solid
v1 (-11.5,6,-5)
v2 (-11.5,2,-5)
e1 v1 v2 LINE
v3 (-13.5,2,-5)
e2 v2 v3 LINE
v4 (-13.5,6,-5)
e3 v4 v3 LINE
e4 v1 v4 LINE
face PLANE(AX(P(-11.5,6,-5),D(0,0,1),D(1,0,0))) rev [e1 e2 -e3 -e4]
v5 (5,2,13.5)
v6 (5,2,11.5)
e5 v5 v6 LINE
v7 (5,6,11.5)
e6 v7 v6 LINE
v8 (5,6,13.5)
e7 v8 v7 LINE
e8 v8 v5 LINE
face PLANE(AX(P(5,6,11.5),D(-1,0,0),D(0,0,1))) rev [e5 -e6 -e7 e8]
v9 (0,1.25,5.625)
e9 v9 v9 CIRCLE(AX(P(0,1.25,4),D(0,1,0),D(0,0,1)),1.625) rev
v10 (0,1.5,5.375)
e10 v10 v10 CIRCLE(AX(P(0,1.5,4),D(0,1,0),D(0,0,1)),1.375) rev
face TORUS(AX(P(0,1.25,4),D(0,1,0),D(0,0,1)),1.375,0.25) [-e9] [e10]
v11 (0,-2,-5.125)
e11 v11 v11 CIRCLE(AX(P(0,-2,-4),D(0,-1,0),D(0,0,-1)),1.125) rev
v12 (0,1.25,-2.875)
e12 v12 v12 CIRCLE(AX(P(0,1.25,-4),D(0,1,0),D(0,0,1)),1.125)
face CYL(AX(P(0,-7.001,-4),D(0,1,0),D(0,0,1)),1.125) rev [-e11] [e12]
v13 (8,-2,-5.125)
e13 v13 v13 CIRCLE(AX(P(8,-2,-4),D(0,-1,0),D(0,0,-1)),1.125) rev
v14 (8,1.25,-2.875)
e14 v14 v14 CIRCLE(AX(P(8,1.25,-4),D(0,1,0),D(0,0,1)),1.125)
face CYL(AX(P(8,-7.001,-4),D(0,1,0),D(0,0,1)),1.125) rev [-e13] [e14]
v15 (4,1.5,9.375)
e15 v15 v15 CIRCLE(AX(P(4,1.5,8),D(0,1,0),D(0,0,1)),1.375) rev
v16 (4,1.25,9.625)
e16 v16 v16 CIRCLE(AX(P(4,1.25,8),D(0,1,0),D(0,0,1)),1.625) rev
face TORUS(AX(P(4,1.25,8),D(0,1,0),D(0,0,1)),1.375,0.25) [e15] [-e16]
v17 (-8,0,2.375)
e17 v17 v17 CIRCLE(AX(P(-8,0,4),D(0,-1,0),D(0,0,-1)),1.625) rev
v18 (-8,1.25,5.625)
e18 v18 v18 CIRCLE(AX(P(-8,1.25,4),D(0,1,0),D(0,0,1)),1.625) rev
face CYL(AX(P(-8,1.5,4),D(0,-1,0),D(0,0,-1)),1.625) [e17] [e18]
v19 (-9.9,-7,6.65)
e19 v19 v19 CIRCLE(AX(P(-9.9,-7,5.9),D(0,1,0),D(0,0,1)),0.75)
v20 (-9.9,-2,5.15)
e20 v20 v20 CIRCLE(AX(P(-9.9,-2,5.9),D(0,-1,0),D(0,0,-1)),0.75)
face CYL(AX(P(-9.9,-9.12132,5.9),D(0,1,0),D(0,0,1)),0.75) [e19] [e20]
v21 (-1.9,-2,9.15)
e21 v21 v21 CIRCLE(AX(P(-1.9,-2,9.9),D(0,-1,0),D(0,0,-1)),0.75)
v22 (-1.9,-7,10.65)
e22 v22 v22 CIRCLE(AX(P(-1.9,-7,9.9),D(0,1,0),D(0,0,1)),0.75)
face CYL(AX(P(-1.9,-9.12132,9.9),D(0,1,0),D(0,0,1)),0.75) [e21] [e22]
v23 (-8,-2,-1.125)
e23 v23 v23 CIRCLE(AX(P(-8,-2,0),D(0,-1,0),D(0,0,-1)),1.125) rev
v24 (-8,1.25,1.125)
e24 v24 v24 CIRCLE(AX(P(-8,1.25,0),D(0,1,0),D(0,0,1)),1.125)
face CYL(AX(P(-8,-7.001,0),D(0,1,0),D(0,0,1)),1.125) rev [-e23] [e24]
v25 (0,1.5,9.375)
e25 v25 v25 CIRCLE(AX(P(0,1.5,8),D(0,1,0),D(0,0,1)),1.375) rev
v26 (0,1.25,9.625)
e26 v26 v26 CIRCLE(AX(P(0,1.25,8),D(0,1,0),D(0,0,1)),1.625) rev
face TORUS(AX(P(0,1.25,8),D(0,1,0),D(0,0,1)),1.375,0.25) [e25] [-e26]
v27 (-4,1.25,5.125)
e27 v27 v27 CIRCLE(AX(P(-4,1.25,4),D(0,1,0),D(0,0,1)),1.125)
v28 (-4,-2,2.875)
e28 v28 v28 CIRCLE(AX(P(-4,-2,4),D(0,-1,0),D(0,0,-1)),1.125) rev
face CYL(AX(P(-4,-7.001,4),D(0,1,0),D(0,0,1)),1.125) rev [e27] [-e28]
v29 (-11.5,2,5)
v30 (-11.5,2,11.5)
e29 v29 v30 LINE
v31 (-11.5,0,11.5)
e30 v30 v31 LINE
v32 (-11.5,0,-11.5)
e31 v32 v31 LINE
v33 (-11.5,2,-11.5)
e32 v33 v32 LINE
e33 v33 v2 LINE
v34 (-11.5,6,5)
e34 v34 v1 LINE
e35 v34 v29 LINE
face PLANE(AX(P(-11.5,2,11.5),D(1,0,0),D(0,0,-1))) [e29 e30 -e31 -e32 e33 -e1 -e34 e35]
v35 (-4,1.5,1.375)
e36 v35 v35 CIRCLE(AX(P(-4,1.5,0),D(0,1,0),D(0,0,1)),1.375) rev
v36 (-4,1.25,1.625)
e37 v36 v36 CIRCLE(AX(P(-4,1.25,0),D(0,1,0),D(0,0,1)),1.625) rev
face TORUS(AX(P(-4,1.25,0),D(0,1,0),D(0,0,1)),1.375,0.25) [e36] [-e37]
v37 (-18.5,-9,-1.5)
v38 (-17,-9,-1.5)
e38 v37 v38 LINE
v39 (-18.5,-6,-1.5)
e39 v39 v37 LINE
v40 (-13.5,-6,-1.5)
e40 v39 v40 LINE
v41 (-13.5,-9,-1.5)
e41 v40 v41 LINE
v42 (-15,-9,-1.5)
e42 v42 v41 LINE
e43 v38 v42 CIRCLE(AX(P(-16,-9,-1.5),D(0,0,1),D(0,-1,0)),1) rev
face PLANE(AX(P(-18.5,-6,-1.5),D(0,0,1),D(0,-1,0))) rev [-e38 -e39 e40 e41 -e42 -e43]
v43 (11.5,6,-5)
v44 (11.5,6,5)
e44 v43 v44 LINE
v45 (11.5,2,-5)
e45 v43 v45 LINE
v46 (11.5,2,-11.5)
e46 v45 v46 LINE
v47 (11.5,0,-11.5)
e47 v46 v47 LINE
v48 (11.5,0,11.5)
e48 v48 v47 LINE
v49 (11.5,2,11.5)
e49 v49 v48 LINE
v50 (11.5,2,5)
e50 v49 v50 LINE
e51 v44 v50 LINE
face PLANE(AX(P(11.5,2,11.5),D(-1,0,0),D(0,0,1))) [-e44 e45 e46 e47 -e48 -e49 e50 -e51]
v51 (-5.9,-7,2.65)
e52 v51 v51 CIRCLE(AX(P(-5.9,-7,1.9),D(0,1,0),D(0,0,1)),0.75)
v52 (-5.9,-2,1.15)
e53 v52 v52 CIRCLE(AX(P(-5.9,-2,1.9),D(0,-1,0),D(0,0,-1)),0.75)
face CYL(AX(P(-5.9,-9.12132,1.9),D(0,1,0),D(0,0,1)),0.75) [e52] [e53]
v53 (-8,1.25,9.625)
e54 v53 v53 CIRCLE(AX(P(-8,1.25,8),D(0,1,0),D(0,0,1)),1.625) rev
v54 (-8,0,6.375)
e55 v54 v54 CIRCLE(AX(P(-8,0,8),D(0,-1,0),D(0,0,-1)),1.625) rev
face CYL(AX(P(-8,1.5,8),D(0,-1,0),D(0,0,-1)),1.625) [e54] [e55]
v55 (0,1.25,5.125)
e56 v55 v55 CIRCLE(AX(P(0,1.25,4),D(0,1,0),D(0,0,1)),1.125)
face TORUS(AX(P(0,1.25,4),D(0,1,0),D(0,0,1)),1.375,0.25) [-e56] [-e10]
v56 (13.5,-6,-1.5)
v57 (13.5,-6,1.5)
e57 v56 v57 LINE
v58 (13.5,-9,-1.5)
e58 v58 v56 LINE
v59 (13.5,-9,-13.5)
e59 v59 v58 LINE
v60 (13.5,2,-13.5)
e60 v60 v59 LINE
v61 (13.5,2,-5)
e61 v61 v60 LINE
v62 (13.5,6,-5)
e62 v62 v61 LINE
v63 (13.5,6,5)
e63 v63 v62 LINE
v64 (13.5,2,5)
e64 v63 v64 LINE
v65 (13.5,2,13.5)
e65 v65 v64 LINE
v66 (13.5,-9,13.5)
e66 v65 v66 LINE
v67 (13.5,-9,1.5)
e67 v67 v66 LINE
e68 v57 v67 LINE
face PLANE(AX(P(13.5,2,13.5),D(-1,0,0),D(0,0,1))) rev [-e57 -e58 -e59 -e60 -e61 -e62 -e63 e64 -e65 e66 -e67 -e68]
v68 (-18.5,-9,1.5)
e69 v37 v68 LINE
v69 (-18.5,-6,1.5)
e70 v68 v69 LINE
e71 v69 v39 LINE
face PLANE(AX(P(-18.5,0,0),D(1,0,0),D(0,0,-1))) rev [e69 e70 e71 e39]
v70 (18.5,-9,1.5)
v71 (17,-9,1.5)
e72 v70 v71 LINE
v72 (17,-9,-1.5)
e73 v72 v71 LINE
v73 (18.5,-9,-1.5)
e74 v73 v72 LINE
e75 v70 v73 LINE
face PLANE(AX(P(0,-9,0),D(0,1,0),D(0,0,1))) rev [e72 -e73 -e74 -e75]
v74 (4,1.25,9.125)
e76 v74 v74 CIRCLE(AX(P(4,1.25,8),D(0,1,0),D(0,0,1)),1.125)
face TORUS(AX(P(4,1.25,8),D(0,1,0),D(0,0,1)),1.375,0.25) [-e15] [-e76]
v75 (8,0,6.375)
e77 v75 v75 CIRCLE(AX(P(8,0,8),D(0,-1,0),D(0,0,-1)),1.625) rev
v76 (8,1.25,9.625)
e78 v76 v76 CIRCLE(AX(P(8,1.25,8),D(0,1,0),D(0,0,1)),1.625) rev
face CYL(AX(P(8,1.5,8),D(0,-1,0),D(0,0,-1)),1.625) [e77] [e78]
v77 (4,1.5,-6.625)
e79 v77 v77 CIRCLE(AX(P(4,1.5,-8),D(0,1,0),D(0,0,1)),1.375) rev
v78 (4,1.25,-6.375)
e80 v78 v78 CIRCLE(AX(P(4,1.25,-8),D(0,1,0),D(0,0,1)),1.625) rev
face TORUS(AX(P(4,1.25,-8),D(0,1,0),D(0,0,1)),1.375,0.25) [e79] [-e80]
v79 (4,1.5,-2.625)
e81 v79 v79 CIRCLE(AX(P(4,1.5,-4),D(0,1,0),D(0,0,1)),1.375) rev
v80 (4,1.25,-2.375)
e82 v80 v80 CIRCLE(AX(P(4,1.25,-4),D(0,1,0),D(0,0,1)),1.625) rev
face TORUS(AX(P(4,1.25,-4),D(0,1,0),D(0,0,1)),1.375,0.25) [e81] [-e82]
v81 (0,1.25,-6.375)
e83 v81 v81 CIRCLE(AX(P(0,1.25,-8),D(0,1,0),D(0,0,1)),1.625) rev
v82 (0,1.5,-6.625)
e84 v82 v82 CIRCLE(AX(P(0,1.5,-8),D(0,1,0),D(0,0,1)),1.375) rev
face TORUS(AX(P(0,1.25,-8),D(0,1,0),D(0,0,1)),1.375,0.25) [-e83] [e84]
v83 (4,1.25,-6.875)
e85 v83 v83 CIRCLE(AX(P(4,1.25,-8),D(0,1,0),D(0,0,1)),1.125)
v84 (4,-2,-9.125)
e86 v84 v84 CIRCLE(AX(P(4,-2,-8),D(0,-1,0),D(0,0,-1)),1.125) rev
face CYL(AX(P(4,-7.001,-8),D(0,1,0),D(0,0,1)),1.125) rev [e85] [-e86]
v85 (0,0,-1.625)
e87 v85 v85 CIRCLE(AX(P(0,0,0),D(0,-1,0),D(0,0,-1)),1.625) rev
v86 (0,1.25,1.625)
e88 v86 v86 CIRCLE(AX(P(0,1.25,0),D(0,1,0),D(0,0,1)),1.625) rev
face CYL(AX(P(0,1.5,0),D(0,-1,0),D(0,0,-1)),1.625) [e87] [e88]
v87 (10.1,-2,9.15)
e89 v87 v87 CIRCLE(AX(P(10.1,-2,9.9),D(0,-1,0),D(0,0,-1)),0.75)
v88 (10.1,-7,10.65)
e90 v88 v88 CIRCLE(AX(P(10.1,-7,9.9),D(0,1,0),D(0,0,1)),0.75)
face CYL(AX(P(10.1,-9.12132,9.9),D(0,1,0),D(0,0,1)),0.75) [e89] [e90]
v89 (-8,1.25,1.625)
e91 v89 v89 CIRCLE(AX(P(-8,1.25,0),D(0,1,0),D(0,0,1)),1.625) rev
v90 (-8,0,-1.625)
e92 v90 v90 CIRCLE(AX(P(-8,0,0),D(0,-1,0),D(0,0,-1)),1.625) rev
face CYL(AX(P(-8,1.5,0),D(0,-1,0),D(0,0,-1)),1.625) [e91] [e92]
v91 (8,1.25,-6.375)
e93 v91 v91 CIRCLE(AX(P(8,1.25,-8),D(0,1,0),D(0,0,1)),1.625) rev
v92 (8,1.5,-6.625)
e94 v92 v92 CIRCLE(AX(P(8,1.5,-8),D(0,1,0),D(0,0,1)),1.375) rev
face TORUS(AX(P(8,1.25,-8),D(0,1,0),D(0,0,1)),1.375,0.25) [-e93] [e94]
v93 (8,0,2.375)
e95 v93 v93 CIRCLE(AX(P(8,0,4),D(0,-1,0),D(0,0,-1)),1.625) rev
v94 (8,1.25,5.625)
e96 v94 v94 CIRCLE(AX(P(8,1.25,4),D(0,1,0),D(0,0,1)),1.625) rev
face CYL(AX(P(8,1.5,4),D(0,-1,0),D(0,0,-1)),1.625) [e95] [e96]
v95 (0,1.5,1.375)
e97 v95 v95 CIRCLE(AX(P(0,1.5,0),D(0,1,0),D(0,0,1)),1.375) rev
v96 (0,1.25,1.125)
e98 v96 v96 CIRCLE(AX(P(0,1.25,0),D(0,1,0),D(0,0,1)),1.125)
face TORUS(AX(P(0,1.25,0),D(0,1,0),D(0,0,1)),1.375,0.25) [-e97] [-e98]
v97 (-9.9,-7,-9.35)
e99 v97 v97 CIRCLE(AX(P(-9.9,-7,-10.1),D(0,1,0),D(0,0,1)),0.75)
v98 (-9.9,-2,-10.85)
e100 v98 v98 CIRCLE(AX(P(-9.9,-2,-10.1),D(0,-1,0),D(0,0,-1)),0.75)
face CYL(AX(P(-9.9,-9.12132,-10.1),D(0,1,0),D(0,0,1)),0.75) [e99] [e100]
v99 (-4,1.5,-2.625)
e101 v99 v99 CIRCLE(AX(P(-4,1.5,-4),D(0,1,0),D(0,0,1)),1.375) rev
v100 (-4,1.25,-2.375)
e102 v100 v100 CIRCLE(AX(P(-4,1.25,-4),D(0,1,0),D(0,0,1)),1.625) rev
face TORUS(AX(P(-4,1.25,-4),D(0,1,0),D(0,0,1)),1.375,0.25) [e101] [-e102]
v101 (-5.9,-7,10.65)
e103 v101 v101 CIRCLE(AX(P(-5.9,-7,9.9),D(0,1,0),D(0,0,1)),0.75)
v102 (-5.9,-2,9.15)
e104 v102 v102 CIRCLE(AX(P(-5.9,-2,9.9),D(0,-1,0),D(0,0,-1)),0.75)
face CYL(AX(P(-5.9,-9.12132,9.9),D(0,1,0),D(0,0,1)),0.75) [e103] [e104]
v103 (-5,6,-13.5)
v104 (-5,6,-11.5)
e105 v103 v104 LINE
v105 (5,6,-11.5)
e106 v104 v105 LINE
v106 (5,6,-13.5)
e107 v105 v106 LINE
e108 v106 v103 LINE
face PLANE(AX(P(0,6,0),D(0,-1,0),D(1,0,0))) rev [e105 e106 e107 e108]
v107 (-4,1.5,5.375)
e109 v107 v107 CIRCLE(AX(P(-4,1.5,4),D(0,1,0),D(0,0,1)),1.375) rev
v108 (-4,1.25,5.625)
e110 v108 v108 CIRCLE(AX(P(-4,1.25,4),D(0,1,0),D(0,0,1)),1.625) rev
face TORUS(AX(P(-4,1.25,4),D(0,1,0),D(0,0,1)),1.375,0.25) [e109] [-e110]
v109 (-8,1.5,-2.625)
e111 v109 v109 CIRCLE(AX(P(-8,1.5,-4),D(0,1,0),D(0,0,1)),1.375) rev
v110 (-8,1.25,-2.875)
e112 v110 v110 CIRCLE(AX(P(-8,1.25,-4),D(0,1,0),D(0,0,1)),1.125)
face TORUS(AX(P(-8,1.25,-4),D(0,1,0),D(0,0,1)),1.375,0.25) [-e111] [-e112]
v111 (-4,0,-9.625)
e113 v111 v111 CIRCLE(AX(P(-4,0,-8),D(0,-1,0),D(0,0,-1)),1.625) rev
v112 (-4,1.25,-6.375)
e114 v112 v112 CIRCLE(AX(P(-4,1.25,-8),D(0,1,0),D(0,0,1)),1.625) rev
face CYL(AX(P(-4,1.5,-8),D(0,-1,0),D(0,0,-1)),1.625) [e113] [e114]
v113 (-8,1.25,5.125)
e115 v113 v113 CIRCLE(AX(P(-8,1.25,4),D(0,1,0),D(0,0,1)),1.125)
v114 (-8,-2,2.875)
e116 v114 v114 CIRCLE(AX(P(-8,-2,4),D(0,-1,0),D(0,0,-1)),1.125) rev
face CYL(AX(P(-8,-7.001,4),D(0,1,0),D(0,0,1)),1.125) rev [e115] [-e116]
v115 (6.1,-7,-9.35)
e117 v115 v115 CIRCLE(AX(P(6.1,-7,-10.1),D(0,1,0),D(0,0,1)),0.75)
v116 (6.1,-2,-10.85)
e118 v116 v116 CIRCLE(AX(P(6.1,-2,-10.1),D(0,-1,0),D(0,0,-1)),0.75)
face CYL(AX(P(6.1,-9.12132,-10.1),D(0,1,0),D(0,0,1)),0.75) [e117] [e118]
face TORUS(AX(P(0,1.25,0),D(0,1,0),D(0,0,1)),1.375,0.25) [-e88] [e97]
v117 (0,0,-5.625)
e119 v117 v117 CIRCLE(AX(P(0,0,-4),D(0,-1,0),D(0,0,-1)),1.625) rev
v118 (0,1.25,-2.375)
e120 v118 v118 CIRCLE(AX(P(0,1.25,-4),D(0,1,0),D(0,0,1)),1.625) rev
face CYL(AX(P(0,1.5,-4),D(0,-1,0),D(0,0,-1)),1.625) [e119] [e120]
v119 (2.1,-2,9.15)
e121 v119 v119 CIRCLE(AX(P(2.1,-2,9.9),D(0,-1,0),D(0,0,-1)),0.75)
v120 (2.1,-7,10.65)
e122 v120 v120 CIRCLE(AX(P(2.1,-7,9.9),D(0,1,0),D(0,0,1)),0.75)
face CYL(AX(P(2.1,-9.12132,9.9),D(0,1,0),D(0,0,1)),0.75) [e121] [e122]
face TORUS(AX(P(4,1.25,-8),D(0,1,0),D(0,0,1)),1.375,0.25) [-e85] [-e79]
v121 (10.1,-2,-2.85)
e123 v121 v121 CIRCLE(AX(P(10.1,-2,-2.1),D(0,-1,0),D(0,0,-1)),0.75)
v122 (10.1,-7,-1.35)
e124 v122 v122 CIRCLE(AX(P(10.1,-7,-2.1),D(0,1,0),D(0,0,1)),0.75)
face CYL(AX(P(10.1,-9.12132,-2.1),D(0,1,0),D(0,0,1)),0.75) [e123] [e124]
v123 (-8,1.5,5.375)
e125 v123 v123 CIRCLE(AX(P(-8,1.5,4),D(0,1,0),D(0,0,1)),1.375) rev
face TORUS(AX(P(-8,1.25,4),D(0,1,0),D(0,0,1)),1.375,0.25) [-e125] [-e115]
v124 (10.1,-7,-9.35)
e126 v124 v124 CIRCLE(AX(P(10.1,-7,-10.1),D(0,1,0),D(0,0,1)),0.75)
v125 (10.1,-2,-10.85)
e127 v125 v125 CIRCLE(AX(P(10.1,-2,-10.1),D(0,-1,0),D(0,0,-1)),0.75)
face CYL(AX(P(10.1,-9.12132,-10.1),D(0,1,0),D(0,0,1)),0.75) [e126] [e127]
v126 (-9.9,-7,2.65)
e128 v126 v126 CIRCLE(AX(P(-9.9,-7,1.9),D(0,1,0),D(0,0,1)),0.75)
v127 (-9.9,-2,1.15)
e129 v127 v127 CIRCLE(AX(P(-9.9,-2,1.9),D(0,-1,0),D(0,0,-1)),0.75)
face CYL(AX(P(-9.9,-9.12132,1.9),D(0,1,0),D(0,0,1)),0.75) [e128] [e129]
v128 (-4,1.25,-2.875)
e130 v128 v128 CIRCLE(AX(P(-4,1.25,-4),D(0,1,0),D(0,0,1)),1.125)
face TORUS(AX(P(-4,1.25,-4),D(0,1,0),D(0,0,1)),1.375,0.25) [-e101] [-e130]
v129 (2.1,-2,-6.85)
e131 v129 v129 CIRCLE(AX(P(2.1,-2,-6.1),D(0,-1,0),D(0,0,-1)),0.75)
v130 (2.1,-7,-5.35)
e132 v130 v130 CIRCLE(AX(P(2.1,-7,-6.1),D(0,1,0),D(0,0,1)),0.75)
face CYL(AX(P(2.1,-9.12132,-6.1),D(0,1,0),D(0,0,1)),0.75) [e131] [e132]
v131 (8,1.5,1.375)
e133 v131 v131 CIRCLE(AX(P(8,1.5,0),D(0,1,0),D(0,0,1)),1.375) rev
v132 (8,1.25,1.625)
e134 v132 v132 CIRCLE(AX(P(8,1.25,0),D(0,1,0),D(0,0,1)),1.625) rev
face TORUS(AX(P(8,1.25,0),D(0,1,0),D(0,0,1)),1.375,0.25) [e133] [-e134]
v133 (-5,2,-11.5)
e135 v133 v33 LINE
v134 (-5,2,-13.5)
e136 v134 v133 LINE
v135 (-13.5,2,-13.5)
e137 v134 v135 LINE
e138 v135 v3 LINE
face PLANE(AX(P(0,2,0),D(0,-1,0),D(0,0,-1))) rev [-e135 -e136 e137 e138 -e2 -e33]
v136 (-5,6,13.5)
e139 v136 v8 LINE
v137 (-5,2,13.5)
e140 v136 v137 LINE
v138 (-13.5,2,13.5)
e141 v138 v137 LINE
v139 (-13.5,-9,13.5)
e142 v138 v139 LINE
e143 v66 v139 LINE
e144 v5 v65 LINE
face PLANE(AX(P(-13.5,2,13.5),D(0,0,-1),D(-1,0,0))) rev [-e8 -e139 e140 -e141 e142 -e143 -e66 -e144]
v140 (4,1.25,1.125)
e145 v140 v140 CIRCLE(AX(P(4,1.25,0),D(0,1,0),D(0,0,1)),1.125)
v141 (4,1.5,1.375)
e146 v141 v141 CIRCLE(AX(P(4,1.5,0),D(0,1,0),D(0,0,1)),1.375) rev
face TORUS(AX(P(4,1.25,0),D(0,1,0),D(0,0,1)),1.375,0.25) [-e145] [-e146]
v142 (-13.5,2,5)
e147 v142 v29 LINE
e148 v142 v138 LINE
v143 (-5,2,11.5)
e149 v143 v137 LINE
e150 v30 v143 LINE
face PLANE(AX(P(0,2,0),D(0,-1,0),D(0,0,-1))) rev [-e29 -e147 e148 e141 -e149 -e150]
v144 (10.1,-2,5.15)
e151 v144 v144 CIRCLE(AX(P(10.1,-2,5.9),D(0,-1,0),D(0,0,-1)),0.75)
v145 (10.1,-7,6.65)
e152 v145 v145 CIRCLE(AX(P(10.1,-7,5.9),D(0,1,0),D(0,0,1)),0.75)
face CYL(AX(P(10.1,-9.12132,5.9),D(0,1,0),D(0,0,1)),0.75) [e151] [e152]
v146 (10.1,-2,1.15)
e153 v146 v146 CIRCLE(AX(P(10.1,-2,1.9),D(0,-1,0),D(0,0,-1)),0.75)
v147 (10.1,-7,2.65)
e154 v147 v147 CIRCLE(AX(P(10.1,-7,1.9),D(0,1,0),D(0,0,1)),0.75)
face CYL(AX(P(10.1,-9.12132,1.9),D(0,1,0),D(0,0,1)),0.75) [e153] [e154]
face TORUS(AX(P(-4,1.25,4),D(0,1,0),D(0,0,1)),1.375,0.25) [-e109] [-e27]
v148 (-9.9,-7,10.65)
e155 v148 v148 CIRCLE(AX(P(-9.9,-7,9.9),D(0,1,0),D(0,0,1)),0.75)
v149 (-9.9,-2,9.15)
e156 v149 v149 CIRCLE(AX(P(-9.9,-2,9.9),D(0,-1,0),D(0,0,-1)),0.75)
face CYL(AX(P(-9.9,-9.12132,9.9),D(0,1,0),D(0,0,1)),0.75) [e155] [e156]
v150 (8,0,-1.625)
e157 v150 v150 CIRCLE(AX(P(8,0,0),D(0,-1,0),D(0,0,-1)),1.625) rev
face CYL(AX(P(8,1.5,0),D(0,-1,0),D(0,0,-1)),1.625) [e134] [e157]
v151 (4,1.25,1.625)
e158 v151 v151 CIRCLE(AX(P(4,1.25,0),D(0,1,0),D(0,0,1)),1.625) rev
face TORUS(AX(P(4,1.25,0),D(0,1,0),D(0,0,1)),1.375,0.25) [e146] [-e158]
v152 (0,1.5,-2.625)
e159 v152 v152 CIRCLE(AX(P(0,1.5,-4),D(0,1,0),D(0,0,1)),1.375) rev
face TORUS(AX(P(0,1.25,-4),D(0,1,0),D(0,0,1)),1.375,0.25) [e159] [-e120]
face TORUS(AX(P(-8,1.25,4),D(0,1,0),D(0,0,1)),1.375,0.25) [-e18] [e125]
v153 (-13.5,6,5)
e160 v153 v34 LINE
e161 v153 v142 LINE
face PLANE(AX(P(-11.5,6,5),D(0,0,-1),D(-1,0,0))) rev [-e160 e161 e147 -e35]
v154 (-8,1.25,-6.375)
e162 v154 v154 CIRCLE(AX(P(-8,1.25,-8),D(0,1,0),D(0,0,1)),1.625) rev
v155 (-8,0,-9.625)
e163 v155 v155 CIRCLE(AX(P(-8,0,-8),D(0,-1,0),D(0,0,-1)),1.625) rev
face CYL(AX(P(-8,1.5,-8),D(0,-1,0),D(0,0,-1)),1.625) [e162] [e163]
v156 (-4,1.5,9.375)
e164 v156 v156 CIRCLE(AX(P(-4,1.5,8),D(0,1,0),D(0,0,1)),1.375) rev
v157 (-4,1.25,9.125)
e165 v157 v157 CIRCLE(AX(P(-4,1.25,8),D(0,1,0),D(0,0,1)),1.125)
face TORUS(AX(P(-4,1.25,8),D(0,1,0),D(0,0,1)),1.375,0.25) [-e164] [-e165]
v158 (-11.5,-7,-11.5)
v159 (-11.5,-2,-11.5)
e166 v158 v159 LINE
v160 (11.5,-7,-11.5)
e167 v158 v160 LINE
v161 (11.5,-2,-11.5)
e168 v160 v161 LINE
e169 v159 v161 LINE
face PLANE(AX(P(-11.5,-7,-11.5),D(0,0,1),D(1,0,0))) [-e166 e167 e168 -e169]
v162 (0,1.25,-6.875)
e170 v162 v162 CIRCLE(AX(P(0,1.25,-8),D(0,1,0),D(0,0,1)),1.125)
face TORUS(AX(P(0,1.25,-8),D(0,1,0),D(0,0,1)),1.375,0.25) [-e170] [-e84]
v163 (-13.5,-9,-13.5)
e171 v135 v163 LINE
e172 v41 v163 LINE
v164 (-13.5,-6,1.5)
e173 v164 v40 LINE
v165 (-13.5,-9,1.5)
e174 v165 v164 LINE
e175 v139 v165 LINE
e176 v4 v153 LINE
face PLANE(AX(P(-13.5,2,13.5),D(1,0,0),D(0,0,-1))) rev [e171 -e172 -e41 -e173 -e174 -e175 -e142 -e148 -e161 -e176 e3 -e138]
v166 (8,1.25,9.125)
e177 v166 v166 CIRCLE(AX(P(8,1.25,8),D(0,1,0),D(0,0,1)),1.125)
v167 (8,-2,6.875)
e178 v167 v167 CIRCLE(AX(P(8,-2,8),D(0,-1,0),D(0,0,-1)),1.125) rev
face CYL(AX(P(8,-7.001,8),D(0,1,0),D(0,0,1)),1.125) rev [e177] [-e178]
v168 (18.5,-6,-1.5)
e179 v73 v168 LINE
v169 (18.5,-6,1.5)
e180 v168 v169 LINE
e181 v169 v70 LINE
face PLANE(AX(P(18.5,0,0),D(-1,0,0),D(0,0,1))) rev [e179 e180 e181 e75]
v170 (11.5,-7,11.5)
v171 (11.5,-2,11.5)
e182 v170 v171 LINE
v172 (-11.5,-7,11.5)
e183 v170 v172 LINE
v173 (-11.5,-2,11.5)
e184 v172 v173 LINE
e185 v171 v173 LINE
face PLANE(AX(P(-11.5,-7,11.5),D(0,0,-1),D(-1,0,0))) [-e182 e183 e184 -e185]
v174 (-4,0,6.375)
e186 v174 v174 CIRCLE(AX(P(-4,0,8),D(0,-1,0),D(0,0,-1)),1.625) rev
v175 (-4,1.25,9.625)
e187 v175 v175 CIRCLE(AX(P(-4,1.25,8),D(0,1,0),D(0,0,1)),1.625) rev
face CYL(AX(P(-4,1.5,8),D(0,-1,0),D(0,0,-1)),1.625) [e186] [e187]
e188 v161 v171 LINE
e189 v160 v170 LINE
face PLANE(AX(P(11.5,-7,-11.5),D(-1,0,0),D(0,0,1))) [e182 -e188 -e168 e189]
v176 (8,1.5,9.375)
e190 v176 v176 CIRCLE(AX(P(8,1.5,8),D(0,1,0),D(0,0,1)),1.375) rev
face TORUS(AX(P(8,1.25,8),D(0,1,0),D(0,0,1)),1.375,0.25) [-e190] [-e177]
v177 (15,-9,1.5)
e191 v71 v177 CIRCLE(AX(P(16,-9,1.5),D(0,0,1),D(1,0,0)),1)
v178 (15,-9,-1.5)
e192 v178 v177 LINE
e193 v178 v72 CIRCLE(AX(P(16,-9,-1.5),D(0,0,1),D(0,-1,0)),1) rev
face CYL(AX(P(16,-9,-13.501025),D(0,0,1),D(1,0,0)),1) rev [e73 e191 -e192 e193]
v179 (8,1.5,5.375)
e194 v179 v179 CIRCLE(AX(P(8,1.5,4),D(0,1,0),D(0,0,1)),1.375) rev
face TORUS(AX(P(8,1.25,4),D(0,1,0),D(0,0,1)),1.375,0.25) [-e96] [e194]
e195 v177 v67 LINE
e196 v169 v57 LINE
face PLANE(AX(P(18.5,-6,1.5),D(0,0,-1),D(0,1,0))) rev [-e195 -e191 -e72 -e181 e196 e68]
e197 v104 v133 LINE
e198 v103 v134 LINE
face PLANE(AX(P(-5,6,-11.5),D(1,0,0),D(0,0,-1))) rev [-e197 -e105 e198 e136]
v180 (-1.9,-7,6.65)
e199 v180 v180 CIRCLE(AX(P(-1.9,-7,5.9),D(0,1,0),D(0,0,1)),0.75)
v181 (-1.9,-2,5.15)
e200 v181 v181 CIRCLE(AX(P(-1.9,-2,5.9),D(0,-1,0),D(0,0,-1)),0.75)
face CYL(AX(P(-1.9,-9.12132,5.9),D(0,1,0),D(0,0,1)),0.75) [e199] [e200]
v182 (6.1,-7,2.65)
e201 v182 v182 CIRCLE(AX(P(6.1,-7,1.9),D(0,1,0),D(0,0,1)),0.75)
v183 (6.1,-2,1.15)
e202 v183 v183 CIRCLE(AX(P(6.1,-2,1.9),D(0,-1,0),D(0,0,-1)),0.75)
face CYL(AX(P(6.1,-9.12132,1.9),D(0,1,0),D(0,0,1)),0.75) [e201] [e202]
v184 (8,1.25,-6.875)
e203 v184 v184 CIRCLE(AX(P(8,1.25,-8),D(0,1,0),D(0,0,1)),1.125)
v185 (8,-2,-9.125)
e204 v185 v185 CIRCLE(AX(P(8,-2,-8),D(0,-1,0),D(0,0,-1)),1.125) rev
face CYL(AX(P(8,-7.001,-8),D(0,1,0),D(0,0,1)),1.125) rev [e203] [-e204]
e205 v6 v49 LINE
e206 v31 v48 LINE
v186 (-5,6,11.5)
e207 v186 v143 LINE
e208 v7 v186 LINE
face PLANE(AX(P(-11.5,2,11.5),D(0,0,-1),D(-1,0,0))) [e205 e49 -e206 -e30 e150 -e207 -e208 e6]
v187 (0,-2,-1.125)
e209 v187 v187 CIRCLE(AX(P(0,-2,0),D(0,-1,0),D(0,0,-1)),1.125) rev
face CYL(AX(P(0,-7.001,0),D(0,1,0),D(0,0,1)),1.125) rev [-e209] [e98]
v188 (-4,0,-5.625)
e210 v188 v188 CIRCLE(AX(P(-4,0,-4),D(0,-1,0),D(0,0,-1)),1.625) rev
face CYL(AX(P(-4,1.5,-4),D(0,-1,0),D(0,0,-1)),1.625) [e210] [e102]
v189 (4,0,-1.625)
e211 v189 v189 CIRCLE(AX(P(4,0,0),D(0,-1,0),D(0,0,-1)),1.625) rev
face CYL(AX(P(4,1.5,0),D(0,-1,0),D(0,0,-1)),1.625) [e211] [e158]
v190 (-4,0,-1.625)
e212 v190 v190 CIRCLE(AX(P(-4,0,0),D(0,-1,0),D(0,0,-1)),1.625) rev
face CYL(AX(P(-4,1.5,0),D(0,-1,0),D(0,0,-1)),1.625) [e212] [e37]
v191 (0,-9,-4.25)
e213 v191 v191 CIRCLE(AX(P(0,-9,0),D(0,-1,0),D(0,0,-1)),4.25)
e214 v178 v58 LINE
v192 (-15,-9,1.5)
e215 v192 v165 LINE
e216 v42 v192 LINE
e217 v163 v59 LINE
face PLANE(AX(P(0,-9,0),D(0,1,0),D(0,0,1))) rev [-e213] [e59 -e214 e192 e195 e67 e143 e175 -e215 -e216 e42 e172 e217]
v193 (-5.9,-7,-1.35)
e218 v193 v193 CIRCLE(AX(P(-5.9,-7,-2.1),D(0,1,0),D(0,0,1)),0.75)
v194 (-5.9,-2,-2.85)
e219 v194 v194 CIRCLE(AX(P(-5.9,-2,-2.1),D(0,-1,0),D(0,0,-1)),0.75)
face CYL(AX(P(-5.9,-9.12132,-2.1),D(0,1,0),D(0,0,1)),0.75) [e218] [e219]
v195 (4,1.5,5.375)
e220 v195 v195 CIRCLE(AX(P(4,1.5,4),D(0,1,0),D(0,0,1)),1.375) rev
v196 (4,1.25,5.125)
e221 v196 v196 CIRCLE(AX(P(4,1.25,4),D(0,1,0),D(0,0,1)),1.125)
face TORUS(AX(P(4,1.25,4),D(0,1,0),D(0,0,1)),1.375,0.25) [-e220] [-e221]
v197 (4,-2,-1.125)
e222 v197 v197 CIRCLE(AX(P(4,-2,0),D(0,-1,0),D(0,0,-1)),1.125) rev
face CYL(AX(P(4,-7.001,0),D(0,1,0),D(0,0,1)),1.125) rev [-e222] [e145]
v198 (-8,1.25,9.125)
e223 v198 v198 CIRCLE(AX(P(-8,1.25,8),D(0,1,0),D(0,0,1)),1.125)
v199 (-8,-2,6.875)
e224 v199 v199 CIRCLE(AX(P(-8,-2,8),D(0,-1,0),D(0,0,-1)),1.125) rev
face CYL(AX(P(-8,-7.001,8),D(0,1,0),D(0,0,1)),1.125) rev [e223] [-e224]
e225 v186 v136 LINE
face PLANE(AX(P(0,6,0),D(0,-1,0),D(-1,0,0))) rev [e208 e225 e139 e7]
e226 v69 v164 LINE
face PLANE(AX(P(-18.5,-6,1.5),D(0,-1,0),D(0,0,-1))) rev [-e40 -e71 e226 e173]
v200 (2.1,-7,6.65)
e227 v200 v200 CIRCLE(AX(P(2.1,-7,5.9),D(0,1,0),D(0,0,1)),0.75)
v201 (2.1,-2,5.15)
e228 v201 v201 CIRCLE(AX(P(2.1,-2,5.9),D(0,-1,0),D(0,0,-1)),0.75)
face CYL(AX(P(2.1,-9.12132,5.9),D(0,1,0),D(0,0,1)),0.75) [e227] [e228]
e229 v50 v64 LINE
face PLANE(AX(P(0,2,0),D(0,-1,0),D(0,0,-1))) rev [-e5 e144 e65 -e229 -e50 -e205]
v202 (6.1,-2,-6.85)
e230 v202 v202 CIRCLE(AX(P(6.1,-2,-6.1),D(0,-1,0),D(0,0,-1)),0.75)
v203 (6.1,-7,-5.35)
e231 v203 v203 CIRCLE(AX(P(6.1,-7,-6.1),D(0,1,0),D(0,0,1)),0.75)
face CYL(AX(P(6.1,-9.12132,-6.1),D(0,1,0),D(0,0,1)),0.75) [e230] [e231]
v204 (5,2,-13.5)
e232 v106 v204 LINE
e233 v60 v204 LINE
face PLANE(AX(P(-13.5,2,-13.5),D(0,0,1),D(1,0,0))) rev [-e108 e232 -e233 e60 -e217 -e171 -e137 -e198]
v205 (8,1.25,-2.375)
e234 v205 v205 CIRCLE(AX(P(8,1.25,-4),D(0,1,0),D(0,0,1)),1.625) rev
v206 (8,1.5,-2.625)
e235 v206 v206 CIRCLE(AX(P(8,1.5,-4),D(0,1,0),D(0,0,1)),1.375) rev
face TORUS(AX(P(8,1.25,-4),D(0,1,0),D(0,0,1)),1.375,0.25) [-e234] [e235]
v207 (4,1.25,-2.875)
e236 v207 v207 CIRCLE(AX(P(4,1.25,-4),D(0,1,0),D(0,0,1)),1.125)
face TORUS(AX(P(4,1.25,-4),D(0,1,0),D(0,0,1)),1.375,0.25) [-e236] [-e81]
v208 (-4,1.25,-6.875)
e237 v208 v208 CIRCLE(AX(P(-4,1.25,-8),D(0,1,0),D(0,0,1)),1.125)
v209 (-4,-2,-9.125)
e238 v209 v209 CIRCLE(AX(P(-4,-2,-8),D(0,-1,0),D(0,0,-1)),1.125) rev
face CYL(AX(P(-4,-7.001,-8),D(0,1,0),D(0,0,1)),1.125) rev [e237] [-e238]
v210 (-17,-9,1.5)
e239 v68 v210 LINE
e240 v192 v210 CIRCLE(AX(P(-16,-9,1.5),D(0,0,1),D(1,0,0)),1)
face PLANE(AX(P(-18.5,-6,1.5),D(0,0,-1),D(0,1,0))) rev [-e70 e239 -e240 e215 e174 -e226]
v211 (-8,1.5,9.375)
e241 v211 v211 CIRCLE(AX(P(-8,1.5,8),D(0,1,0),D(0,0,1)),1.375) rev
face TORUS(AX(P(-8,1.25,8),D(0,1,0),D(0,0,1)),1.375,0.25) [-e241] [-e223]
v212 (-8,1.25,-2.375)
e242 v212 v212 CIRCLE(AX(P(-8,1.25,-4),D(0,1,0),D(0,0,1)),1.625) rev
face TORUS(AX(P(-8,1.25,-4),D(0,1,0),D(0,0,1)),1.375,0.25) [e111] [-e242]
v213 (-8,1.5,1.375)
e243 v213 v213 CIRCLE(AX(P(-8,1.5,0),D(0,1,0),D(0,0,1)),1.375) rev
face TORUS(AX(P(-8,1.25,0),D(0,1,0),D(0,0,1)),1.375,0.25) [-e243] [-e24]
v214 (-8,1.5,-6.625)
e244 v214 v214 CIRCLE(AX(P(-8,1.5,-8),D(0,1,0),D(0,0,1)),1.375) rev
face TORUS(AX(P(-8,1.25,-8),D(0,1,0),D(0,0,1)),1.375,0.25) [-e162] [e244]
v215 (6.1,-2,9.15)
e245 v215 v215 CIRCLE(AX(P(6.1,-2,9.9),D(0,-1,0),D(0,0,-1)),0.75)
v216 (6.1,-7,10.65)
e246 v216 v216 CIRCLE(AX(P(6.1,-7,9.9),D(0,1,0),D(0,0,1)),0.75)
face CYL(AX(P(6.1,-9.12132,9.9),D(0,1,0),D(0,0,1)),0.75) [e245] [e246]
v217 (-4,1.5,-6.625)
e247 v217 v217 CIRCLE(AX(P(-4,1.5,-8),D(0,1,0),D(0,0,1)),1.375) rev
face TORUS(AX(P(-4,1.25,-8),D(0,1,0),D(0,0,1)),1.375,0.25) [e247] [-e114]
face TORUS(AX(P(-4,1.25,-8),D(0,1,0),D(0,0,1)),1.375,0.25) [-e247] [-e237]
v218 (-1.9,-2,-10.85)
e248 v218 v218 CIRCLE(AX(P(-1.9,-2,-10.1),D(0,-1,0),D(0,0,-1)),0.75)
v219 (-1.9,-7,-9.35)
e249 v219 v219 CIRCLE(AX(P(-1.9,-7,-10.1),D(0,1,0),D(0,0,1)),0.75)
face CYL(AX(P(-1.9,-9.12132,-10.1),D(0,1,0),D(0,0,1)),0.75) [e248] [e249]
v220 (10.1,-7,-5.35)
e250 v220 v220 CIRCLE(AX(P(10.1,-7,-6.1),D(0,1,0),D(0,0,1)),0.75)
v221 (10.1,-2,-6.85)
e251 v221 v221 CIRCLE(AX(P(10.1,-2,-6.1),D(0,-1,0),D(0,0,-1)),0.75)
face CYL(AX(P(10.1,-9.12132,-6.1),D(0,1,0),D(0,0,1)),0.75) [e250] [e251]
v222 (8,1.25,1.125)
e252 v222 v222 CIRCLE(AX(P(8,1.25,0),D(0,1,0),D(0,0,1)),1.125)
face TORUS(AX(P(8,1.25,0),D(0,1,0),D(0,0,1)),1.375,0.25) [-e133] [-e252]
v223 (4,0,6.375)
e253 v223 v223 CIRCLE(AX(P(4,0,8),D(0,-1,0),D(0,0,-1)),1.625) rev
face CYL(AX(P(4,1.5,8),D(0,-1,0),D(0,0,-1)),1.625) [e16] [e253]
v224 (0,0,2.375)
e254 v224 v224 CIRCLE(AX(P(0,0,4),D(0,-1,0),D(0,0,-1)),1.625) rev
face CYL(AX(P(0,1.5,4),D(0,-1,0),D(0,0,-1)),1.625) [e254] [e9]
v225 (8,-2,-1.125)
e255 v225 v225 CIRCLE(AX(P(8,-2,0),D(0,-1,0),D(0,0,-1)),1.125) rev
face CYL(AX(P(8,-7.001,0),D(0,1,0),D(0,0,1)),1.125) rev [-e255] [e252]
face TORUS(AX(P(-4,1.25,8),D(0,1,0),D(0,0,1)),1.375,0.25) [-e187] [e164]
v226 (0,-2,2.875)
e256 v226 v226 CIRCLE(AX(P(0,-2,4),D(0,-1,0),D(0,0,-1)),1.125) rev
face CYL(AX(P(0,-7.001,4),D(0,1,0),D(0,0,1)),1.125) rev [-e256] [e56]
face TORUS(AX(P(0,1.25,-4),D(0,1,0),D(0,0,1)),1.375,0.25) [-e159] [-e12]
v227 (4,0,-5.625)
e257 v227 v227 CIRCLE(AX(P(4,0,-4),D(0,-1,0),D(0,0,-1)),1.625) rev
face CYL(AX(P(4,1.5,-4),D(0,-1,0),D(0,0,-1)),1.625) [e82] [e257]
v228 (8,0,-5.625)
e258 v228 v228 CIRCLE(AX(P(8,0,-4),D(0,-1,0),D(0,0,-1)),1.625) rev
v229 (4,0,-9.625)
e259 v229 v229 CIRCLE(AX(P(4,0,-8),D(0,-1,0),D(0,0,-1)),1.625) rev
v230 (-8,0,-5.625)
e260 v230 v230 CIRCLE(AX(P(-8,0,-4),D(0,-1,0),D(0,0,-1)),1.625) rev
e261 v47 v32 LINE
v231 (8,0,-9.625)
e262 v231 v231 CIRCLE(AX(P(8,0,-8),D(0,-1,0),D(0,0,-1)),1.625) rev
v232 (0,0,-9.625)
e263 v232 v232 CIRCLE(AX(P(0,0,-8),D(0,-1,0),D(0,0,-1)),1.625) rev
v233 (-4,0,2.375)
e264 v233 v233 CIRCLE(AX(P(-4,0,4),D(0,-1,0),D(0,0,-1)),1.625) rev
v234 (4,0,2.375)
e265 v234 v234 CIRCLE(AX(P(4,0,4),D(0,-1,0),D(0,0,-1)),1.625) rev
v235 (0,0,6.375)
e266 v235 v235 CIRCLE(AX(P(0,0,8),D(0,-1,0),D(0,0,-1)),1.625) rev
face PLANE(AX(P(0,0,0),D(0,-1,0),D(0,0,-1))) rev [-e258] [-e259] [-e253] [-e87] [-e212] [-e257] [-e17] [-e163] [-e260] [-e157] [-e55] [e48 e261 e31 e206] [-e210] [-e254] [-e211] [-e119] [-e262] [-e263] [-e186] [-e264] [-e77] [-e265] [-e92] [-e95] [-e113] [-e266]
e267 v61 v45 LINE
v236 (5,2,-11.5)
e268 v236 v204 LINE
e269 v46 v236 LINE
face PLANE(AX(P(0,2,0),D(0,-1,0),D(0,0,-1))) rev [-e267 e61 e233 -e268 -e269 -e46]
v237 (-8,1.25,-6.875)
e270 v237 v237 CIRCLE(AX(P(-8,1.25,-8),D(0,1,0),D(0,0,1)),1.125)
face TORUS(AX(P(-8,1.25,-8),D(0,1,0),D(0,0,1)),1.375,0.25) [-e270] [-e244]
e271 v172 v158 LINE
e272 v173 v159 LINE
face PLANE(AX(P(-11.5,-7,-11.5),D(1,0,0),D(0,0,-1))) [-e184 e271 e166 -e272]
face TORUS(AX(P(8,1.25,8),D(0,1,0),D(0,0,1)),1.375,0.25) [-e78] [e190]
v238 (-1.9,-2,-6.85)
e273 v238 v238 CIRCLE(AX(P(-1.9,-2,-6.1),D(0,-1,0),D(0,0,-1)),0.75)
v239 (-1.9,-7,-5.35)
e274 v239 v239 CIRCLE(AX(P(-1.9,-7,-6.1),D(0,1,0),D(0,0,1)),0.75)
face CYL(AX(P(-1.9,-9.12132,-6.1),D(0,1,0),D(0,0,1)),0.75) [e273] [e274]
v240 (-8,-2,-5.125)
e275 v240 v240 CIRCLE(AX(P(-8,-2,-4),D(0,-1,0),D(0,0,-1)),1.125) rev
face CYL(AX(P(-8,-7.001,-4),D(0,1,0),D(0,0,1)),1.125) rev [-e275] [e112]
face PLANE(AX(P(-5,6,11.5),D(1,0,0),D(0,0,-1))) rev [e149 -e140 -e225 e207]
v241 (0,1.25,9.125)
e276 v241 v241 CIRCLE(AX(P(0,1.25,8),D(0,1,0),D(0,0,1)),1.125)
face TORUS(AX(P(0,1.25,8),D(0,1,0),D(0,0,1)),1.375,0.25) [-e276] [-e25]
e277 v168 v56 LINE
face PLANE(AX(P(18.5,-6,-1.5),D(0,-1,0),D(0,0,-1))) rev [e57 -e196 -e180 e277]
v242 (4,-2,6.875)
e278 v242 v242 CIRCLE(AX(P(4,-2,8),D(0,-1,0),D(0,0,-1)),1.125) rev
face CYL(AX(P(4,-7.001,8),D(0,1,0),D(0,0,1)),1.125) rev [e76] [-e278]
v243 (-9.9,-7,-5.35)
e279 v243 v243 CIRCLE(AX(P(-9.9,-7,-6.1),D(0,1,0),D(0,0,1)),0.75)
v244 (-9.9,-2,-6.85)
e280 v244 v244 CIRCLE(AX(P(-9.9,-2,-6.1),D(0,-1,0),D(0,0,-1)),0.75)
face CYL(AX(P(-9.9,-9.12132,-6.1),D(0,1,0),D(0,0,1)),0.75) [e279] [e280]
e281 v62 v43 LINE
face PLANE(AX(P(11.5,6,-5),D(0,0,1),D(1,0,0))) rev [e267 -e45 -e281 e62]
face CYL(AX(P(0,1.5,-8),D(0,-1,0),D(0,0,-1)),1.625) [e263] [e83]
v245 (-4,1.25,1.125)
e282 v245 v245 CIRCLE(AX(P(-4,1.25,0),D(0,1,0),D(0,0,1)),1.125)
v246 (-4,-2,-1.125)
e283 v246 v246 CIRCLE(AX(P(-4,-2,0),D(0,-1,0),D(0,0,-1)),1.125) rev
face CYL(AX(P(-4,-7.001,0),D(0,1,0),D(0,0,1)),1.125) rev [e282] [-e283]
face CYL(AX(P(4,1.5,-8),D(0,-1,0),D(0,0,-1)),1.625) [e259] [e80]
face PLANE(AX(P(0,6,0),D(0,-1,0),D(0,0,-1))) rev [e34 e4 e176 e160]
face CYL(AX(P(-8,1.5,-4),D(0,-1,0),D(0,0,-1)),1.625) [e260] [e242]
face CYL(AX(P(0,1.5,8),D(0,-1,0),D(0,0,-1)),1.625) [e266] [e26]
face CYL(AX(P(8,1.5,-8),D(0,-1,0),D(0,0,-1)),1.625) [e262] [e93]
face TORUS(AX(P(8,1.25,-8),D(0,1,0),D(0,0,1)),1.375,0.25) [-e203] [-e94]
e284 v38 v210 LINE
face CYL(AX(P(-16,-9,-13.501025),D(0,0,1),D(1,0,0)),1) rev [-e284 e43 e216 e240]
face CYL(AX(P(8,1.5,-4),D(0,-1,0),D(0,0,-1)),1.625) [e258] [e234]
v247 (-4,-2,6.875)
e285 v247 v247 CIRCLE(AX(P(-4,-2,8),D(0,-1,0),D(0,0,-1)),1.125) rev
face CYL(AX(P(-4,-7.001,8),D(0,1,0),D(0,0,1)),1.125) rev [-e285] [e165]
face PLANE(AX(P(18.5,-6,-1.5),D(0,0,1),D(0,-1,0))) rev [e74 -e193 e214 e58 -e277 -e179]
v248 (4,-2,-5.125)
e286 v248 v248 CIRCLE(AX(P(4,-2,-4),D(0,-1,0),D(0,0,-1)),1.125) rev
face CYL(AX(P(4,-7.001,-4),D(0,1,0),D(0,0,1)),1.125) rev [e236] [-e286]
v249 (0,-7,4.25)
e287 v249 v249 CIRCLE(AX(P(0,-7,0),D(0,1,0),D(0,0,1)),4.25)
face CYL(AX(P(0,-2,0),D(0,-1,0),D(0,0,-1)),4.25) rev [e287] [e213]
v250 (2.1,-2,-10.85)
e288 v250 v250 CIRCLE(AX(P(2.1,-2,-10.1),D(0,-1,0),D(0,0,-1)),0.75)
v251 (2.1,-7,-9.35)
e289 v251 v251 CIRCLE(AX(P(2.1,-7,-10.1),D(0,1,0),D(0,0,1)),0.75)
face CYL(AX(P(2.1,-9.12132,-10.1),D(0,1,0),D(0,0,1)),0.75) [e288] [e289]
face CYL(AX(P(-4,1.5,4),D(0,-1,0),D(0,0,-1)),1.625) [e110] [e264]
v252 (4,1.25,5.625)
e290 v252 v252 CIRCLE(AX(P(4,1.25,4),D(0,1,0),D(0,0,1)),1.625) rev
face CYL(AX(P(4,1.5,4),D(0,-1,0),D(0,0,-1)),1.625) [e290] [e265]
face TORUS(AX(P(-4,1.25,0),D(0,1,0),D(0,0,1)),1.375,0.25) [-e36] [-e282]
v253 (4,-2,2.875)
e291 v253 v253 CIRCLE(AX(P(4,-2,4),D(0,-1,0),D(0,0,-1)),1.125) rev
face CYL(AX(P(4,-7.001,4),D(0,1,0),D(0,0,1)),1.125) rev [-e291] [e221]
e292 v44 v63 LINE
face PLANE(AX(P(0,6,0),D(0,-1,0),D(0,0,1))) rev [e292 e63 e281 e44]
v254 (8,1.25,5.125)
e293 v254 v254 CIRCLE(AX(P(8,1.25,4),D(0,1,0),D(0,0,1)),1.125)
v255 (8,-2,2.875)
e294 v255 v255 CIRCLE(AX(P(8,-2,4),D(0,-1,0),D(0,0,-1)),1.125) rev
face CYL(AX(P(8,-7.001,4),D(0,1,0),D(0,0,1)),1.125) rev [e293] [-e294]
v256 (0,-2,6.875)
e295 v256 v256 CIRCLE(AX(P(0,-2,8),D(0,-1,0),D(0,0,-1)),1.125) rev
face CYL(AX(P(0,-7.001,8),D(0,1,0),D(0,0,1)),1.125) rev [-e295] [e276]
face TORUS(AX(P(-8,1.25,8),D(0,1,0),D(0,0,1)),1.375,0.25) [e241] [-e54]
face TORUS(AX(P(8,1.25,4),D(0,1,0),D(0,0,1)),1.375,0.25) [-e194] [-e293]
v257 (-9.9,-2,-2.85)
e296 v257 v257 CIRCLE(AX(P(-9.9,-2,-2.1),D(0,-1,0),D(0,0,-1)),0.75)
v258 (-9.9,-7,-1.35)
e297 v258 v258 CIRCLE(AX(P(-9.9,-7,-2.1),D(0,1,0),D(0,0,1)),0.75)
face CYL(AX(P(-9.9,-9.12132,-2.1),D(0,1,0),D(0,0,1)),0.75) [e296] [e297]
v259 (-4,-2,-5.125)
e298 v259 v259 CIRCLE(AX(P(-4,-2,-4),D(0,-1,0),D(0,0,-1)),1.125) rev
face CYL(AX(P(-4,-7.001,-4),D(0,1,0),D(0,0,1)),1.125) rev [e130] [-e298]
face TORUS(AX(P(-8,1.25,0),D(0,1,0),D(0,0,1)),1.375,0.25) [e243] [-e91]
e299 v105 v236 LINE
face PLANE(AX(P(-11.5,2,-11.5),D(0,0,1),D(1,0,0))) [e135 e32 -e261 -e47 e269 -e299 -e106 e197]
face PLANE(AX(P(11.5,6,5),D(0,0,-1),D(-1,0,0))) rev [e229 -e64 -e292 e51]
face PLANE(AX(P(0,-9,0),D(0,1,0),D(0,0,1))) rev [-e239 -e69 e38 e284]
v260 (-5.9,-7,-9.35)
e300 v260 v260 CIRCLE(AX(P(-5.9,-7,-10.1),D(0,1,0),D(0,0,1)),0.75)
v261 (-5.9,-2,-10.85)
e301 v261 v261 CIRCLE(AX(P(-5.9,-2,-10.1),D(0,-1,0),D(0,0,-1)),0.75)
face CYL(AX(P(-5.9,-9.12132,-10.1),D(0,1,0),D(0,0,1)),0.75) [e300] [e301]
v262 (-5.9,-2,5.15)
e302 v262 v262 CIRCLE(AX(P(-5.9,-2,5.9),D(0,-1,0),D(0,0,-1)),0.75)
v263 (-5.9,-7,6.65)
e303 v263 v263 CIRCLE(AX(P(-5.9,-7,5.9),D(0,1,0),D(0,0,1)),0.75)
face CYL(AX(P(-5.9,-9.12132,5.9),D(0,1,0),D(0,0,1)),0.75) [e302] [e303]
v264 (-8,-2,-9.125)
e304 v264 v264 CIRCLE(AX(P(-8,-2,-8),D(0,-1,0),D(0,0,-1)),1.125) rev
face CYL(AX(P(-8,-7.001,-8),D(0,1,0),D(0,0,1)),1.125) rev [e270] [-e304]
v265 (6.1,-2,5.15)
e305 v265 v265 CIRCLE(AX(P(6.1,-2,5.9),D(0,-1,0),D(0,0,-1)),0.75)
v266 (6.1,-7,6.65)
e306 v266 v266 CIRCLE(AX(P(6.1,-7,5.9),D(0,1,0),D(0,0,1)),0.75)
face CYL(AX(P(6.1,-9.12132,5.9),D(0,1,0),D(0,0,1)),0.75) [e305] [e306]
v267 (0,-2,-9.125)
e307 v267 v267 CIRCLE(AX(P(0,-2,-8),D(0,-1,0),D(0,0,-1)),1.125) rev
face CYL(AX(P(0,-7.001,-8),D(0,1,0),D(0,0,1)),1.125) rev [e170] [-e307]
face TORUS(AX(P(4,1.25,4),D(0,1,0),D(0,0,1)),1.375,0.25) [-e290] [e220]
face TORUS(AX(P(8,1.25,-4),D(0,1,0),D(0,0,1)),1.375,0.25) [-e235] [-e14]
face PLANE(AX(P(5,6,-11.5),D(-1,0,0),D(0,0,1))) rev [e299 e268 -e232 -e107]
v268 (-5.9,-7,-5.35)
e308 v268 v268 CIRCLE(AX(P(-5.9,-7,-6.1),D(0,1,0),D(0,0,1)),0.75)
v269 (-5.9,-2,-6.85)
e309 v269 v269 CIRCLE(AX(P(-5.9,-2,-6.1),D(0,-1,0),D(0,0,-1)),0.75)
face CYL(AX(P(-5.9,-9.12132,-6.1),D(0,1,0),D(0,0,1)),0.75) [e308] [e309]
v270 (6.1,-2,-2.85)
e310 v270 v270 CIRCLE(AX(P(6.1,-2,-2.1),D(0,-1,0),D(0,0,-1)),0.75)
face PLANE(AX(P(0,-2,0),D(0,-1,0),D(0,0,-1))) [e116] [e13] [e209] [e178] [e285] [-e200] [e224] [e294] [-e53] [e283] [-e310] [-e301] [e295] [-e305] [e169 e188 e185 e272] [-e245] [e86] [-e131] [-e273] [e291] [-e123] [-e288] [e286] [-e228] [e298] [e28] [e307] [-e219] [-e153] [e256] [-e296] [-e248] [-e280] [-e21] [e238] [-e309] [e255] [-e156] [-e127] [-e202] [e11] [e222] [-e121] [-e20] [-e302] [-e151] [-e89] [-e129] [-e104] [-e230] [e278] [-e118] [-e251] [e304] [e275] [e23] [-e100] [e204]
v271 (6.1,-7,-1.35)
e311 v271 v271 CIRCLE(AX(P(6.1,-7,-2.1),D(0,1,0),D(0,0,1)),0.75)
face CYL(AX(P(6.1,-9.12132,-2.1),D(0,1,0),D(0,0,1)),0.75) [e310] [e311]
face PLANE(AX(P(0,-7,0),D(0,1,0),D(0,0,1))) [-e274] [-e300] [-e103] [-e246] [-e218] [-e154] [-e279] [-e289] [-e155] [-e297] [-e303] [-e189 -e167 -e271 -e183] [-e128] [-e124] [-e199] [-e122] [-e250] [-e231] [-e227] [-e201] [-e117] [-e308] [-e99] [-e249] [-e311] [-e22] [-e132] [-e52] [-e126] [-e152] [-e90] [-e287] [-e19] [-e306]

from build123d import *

# Parameters (mm, degrees)
SKETCH1_W              = 27
SKETCH1_H              = 27
SKETCH1_W_2            = 23
SKETCH1_H_2            = 23
BOSS_EXTRUDE1_DEPTH    = 2
SKETCH2_W              = 27
SKETCH2_H              = 27
BOSS_EXTRUDE2_DEPTH    = 2
SKETCH3_W              = 27
SKETCH3_H              = 27
SKETCH3_W_2            = 23
SKETCH3_H_2            = 23
BOSS_EXTRUDE3_DEPTH    = 5
SKETCH6_R              = 1.625
BOSS_EXTRUDE5_DEPTH    = 1.5
CUT_EXTRUDE2_REACH     = 22.899
SKETCH7_R              = 1.125
FILLET1_R              = 0.25
LPATTERN3_COUNT        = 5
LPATTERN3_PITCH        = 4
LPATTERN3_COUNT_DIR2   = 5
LPATTERN3_PITCH_DIR2   = 4
FILLET1_OF_LPATTERN3_R = 0.25
SKETCH11_R             = 0.75
BOSS_EXTRUDE8_DEPTH    = 5
LPATTERN2_COUNT        = 6
LPATTERN2_PITCH        = 4
LPATTERN2_COUNT_DIR2   = 6
LPATTERN2_PITCH_DIR2   = 4
SKETCH8_W              = 27
SKETCH8_H              = 27
BOSS_EXTRUDE6_DEPTH    = 2
SKETCH9_R              = 4.25
CUT_EXTRUDE3_DEPTH     = 7
SKETCH10_W             = 2
SKETCH10_H             = 10
BOSS_EXTRUDE7_DEPTH    = 4
CIRPATTERN2_COUNT      = 4
SKETCH12_W             = 3
SKETCH12_H             = 3
BOSS_EXTRUDE9_DEPTH    = 5
CUT_EXTRUDE4_START     = -3
CUT_EXTRUDE4_DEPTH     = 3
CUT_EXTRUDE4_2_DEPTH   = 3


# Read off the part's stored shape, not the designer's step: Cut-Extrude4
with BuildPart() as part:
    # Sketch1 → Boss-Extrude1 (new body)
    with BuildSketch(Plane(origin=(0, 0, 0), x_dir=(1, 0, 0), z_dir=(0, 1, 0))):
        Rectangle(SKETCH1_W, SKETCH1_H)
        Rectangle(SKETCH1_W_2, SKETCH1_H_2, mode=Mode.SUBTRACT)
    extrude(amount=BOSS_EXTRUDE1_DEPTH)

    # Sketch2 → Boss-Extrude2 (add)
    with BuildSketch(Plane.XZ):
        Rectangle(SKETCH2_W, SKETCH2_H)
    extrude(amount=BOSS_EXTRUDE2_DEPTH)

    # Sketch3 → Boss-Extrude3 (add)
    with BuildSketch(Plane.XZ.offset(2)):
        Rectangle(SKETCH3_W, SKETCH3_H)
        Rectangle(SKETCH3_W_2, SKETCH3_H_2, mode=Mode.SUBTRACT)
    extrude(amount=BOSS_EXTRUDE3_DEPTH)

    # Sketch6 → Boss-Extrude5 (add)
    with BuildSketch(Plane(origin=(0, 0, 0), x_dir=(1, 0, 0), z_dir=(0, 1, 0))):
        with Locations(Location((8, 8, 0), (0, 0, 90))):
            Circle(SKETCH6_R)
    boss_extrude5 = extrude(amount=BOSS_EXTRUDE5_DEPTH)

    # Sketch7 → Cut-Extrude2 (cut, up to next)
    with BuildSketch(Plane(origin=(0, 1.5, 0), x_dir=(1, 0, 0), z_dir=(0, 1, 0)), mode=Mode.PRIVATE) as cut_extrude2_sk1:
        with Locations(Location((8, 8, 0), (0, 0, 270))):
            Circle(SKETCH7_R)
    cut_extrude2_tool1 = extrude(cut_extrude2_sk1.sketch, amount=-CUT_EXTRUDE2_REACH, mode=Mode.PRIVATE) & part.part
    cut_extrude2 = cut_extrude2_tool1.solids().sort_by_distance((8, 1.5, -8))[0]
    add(cut_extrude2, mode=Mode.SUBTRACT)

    # Fillet1
    fillet1_edges = [part.edges().sort_by_distance(p)[0] for p in [
        (8, 1.5, -6.375),
        (8, 1.5, -9.125),
    ]]
    fillet(fillet1_edges, radius=FILLET1_R - 0.0001)  # a hair under: the kernel refuses the full size

    # LPattern3: Boss-Extrude5, Cut-Extrude2 5 × 5
    with Locations(*[(-j * LPATTERN3_PITCH_DIR2, 0, i * LPATTERN3_PITCH) for i in range(LPATTERN3_COUNT) for j in range(LPATTERN3_COUNT_DIR2) if (i, j) != (0, 0)]):
        add(boss_extrude5)
        add(cut_extrude2, mode=Mode.SUBTRACT)

    # Fillet1 of LPattern3
    fillet1_of_lpattern3_edges = [part.edges().sort_by_distance(p)[0] for p in [
        (4, 1.5, -6.375),
        (4, 1.5, -9.125),
        (0, 1.5, -6.375),
        (0, 1.5, -9.125),
        (-4, 1.5, -6.375),
        (-4, 1.5, -9.125),
        (-8, 1.5, -6.375),
        (-8, 1.5, -9.125),
        (8, 1.5, -2.375),
        (8, 1.5, -5.125),
        (4, 1.5, -2.375),
        (4, 1.5, -5.125),
        (0, 1.5, -2.375),
        (0, 1.5, -5.125),
        (-4, 1.5, -2.375),
        (-4, 1.5, -5.125),
        (-8, 1.5, -2.375),
        (-8, 1.5, -5.125),
        (8, 1.5, 1.625),
        (8, 1.5, -1.125),
        (4, 1.5, 1.625),
        (4, 1.5, -1.125),
        (0, 1.5, 1.625),
        (0, 1.5, -1.125),
        (-4, 1.5, 1.625),
        (-4, 1.5, -1.125),
        (-8, 1.5, 1.625),
        (-8, 1.5, -1.125),
        (8, 1.5, 5.625),
        (8, 1.5, 2.875),
        (4, 1.5, 5.625),
        (4, 1.5, 2.875),
        (0, 1.5, 5.625),
        (0, 1.5, 2.875),
        (-4, 1.5, 5.625),
        (-4, 1.5, 2.875),
        (-8, 1.5, 5.625),
        (-8, 1.5, 2.875),
        (8, 1.5, 9.625),
        (8, 1.5, 6.875),
        (4, 1.5, 9.625),
        (4, 1.5, 6.875),
        (0, 1.5, 9.625),
        (0, 1.5, 6.875),
        (-4, 1.5, 9.625),
        (-4, 1.5, 6.875),
        (-8, 1.5, 9.625),
        (-8, 1.5, 6.875),
    ]]
    fillet(fillet1_of_lpattern3_edges, radius=FILLET1_OF_LPATTERN3_R - 0.0001)  # a hair under: the kernel refuses the full size

    # Sketch11 → Boss-Extrude8 (add)
    with BuildSketch(Plane.XZ.offset(2)):
        with Locations(Location((-9.9, 9.9, 0), (0, 0, 90))):
            Circle(SKETCH11_R)
    boss_extrude8 = extrude(amount=BOSS_EXTRUDE8_DEPTH)

    # LPattern2: Boss-Extrude8 6 × 6
    with Locations(*[(i * LPATTERN2_PITCH, 0, -j * LPATTERN2_PITCH_DIR2) for i in range(LPATTERN2_COUNT) for j in range(LPATTERN2_COUNT_DIR2) if (i, j) != (0, 0)]):
        add(boss_extrude8)

    # Sketch8 → Boss-Extrude6 (add)
    with BuildSketch(Plane.XZ.offset(7)):
        Rectangle(SKETCH8_W, SKETCH8_H)
    extrude(amount=BOSS_EXTRUDE6_DEPTH)

    # Sketch9 → Cut-Extrude3 (cut)
    with BuildSketch(Plane.XZ.offset(9)):
        with Locations(Location((0, 0, 0), (0, 0, 270))):
            Circle(SKETCH9_R)
    extrude(amount=-CUT_EXTRUDE3_DEPTH, mode=Mode.SUBTRACT)

    # Sketch10 → Boss-Extrude7 (add)
    with BuildSketch(Plane(origin=(0, 2, 0), x_dir=(1, 0, 0), z_dir=(0, 1, 0))):
        with Locations((-12.5, 0)):
            Rectangle(SKETCH10_W, SKETCH10_H)
    boss_extrude7 = extrude(amount=BOSS_EXTRUDE7_DEPTH)

    # CirPattern2: Boss-Extrude7 ×4 about axis
    cirpattern2_axis = Axis((0, 0, 0), (0, 1, 0))
    for i in range(1, CIRPATTERN2_COUNT):
        add(boss_extrude7.rotate(cirpattern2_axis, i * 360 / CIRPATTERN2_COUNT))

    # Sketch12 → Boss-Extrude9 (add)
    with BuildSketch(Plane.ZY.offset(13.5)):
        with Locations((0, -7.5)):
            Rectangle(SKETCH12_W, SKETCH12_H)
    extrude(amount=BOSS_EXTRUDE9_DEPTH)

    # Cut-Extrude4 outline → Cut-Extrude4 (cut)
    with BuildSketch(Plane.XY.offset(1.5).offset(CUT_EXTRUDE4_START)):
        with BuildLine():
            Line((-17, -9), (-15, -9))
            ThreePointArc((-15, -9), (-16, -8), (-17, -9))
        make_face()
    extrude(amount=CUT_EXTRUDE4_DEPTH, mode=Mode.SUBTRACT)

    # Cut-Extrude4 2 outline → Cut-Extrude4 2 (add)
    with BuildSketch(Plane.XY.offset(1.5).offset(CUT_EXTRUDE4_START)):
        with BuildLine():
            Line((17, -9), (18.5, -9))
            Line((18.5, -9), (18.5, -6))
            Line((18.5, -6), (13.5, -6))
            Line((13.5, -6), (13.5, -9))
            Line((13.5, -9), (15, -9))
            ThreePointArc((15, -9), (16, -8), (17, -9))
        make_face()
    extrude(amount=CUT_EXTRUDE4_2_DEPTH)


solid = part.part
